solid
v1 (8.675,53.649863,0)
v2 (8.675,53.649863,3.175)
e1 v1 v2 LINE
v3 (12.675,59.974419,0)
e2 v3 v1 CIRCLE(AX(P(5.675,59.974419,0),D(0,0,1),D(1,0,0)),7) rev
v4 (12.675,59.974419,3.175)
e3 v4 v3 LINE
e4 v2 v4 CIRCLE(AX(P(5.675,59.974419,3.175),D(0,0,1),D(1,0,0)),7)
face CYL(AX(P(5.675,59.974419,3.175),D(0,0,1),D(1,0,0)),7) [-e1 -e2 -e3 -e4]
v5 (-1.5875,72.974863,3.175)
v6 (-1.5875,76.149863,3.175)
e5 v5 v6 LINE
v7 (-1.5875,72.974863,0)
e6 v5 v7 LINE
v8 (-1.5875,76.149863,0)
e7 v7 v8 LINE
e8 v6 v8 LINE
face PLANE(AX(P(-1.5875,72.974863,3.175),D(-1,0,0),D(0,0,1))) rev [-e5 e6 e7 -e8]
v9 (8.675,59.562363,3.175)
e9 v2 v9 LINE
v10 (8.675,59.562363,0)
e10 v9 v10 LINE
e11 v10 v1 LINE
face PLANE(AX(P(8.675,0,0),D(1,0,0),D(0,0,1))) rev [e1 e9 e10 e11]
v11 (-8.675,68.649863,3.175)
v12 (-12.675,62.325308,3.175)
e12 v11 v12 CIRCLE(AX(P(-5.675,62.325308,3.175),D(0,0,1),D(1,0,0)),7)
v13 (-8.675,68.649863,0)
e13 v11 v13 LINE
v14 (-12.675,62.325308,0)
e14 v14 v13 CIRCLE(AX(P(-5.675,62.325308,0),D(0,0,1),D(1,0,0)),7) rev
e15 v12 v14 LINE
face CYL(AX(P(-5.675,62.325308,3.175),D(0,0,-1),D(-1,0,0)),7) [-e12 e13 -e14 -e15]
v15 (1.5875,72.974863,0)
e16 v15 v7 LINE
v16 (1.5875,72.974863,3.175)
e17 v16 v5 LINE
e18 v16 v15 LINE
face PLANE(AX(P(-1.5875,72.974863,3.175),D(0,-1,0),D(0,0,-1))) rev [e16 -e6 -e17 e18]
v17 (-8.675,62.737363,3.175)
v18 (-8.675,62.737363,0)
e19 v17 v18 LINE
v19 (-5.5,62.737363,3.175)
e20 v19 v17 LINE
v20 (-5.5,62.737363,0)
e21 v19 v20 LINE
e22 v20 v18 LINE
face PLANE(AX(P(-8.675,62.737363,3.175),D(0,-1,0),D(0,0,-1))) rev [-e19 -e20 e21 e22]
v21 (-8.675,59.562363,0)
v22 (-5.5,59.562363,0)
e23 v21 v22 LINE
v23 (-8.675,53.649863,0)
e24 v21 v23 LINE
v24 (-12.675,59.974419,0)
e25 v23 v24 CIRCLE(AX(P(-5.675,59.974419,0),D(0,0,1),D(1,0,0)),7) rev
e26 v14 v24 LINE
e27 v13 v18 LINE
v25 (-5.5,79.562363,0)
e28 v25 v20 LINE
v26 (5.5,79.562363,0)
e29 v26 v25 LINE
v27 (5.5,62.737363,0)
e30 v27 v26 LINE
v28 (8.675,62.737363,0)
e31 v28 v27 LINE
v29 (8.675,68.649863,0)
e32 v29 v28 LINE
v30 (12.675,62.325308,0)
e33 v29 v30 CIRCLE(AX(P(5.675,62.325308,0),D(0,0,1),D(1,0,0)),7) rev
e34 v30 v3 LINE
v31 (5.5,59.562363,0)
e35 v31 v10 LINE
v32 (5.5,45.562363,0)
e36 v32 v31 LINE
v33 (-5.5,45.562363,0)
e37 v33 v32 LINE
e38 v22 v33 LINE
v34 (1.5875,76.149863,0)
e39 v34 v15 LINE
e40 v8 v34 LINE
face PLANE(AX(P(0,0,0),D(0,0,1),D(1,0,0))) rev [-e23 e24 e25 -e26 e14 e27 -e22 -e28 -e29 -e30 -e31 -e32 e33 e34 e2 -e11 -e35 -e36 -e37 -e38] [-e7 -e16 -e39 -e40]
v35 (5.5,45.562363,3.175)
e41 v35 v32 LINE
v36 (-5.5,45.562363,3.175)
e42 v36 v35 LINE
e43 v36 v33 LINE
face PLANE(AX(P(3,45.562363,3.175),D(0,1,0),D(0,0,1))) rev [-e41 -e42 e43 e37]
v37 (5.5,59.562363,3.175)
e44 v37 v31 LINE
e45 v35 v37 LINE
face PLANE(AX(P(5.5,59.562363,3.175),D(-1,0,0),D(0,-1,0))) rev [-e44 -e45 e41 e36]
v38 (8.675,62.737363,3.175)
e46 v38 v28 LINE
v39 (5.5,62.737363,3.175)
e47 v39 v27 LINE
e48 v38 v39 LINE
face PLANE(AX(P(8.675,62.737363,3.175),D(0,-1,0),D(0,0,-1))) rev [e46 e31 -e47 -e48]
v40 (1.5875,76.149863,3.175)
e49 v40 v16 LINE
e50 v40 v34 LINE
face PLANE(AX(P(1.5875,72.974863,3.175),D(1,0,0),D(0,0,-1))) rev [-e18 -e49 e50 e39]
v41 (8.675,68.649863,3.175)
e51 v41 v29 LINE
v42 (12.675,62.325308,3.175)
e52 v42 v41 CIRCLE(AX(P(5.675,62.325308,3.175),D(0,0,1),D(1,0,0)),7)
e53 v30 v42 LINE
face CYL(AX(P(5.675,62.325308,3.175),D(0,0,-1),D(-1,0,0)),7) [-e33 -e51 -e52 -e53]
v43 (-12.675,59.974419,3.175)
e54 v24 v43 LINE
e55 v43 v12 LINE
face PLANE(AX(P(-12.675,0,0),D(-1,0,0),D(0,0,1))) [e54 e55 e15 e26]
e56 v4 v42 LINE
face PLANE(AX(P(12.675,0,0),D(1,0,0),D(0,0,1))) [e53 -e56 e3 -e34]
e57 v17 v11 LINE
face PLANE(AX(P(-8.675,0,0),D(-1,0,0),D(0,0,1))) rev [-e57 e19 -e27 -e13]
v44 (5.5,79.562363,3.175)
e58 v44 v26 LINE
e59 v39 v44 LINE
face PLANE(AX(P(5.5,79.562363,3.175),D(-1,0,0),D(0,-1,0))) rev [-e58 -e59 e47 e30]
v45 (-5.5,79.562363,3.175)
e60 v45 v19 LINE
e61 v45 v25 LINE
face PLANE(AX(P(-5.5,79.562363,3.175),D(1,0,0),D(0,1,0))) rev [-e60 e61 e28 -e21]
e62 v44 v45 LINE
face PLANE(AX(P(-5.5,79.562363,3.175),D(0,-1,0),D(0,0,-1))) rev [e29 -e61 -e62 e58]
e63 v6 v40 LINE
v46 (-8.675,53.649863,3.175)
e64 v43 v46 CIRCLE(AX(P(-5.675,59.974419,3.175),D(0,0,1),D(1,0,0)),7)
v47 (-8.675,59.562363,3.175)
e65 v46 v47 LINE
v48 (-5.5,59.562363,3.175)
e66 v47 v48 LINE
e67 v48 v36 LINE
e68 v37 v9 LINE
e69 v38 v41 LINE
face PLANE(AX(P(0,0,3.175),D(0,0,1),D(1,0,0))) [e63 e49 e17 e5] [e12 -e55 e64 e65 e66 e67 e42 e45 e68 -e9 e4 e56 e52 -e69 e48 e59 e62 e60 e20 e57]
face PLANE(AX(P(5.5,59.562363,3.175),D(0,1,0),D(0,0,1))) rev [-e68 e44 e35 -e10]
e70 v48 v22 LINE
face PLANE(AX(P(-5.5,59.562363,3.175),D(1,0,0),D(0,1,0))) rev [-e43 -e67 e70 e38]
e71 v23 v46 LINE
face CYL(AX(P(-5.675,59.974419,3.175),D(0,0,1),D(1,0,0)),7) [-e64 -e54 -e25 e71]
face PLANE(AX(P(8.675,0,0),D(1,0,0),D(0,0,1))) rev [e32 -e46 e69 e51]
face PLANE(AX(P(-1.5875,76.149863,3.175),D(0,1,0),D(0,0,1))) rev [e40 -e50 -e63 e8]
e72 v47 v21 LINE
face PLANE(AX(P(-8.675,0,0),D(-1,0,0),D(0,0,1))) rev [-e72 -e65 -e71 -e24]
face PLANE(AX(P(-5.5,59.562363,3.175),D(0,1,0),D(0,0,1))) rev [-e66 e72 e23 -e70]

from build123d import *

# Parameters (mm, degrees)
BOSS_EXTRUDE1_DEPTH = 3.175
SKETCH2_W           = 3.175
SKETCH2_H           = 3.175
CUT_EXTRUDE1_DEPTH  = 81.096853282
SKETCH3_W           = 3.175
SKETCH3_H           = 15
BOSS_EXTRUDE2_DEPTH = 4
FILLET1_R           = 7


with BuildPart() as part:
    # Sketch1 → Boss-Extrude1 (new body)
    with BuildSketch(Plane.XY):
        Polygon((3, 45.562363311), (-3, 45.562363311), (-5.5, 45.562363311), (-5.5, 59.562363311), (-8.675, 59.562363311), (-8.675, 62.737363311), (-5.5, 62.737363311), (-5.5, 79.562363311), (5.5, 79.562363311), (5.5, 62.737363311), (8.675, 62.737363311), (8.675, 59.562363311), (5.5, 59.562363311), (5.5, 45.562363311), align=None)
    extrude(amount=BOSS_EXTRUDE1_DEPTH)

    # Sketch2 → Cut-Extrude1 (cut, through all)
    with BuildSketch(Plane(origin=(0, 0, 0), x_dir=(-1, 0, 0), z_dir=(0, 0, -1))):
        with Locations((0, 74.562363311)):
            Rectangle(SKETCH2_W, SKETCH2_H)
    extrude(amount=-CUT_EXTRUDE1_DEPTH, mode=Mode.SUBTRACT)

    # Sketch3 → Boss-Extrude2 (add)
    with BuildSketch(Plane.ZY.offset(8.675)):
        with Locations((1.5875, 61.149863311)):
            Rectangle(SKETCH3_W, SKETCH3_H)
    boss_extrude2 = extrude(amount=BOSS_EXTRUDE2_DEPTH)

    # Mirror2: Boss-Extrude2 across plane
    add(boss_extrude2.mirror(Plane(origin=(0, 0, 0), x_dir=(0, 0, 1), z_dir=(1, 0, 0))))

    # Fillet1
    # the kernel refuses this fillet: 7 mm, written as the material it takes off along each edge
    with BuildSketch(Plane(origin=(-12.675, 68.649863311, -15.811388301), x_dir=(1, 0, 0), z_dir=(0, 0, 1))) as fillet1_piece_1:
        with BuildLine():
            CenterArc((7, -6.32455532), FILLET1_R, 115.376933525, 64.623066475)
            Line((0, -6.32455532), (-0.14, -6.32455532))
            Line((-0.14, -6.32455532), (-0.14, 0))
            Line((-0.14, 0), (0, 0.14))
            ThreePointArc((0, 0.14), (2, 0.14), (3.94, 0.126491106))
            Line((3.94, 0.126491106), (4, 0))
        make_face()
    extrude(amount=34.797776602, mode=Mode.SUBTRACT)
    with BuildSketch(Plane(origin=(-12.675, 53.649863311, 18.986388301), x_dir=(0, 1, 0), z_dir=(0, 0, -1))) as fillet1_piece_2:
        with BuildLine():
            CenterArc((6.32455532, 7), FILLET1_R, 205.376933525, 64.623066475)
            Line((0, 4), (-0.126491106, 3.94))
            ThreePointArc((-0.126491106, 3.94), (-0.14, 2), (-0.14, 0))
            Line((-0.14, 0), (0, -0.14))
            Line((0, -0.14), (6.32455532, -0.14))
            Line((6.32455532, -0.14), (6.32455532, 0))
        make_face()
    extrude(amount=34.797776602, mode=Mode.SUBTRACT)
    with BuildSketch(Plane(origin=(12.675, 68.649863311, -15.811388301), x_dir=(0, -1, 0), z_dir=(0, 0, 1))) as fillet1_piece_3:
        with BuildLine():
            CenterArc((6.32455532, -7), FILLET1_R, 90, 64.623066475)
            Line((0, -4), (-0.126491106, -3.94))
            ThreePointArc((-0.126491106, -3.94), (-0.14, -2), (-0.14, 0))
            Line((-0.14, 0), (0, 0.14))
            Line((0, 0.14), (6.32455532, 0.14))
            Line((6.32455532, 0.14), (6.32455532, 0))
        make_face()
    extrude(amount=34.797776602, mode=Mode.SUBTRACT)
    with BuildSketch(Plane(origin=(12.675, 53.649863311, 18.986388301), x_dir=(-1, 0, 0), z_dir=(0, 0, -1))) as fillet1_piece_4:
        with BuildLine():
            CenterArc((7, 6.32455532), FILLET1_R, 180, 64.623066475)
            Line((0, 6.32455532), (-0.14, 6.32455532))
            Line((-0.14, 6.32455532), (-0.14, 0))
            Line((-0.14, 0), (0, -0.14))
            ThreePointArc((0, -0.14), (2, -0.14), (3.94, -0.126491106))
            Line((3.94, -0.126491106), (4, 0))
        make_face()
    extrude(amount=34.797776602, mode=Mode.SUBTRACT)


solid = part.part
